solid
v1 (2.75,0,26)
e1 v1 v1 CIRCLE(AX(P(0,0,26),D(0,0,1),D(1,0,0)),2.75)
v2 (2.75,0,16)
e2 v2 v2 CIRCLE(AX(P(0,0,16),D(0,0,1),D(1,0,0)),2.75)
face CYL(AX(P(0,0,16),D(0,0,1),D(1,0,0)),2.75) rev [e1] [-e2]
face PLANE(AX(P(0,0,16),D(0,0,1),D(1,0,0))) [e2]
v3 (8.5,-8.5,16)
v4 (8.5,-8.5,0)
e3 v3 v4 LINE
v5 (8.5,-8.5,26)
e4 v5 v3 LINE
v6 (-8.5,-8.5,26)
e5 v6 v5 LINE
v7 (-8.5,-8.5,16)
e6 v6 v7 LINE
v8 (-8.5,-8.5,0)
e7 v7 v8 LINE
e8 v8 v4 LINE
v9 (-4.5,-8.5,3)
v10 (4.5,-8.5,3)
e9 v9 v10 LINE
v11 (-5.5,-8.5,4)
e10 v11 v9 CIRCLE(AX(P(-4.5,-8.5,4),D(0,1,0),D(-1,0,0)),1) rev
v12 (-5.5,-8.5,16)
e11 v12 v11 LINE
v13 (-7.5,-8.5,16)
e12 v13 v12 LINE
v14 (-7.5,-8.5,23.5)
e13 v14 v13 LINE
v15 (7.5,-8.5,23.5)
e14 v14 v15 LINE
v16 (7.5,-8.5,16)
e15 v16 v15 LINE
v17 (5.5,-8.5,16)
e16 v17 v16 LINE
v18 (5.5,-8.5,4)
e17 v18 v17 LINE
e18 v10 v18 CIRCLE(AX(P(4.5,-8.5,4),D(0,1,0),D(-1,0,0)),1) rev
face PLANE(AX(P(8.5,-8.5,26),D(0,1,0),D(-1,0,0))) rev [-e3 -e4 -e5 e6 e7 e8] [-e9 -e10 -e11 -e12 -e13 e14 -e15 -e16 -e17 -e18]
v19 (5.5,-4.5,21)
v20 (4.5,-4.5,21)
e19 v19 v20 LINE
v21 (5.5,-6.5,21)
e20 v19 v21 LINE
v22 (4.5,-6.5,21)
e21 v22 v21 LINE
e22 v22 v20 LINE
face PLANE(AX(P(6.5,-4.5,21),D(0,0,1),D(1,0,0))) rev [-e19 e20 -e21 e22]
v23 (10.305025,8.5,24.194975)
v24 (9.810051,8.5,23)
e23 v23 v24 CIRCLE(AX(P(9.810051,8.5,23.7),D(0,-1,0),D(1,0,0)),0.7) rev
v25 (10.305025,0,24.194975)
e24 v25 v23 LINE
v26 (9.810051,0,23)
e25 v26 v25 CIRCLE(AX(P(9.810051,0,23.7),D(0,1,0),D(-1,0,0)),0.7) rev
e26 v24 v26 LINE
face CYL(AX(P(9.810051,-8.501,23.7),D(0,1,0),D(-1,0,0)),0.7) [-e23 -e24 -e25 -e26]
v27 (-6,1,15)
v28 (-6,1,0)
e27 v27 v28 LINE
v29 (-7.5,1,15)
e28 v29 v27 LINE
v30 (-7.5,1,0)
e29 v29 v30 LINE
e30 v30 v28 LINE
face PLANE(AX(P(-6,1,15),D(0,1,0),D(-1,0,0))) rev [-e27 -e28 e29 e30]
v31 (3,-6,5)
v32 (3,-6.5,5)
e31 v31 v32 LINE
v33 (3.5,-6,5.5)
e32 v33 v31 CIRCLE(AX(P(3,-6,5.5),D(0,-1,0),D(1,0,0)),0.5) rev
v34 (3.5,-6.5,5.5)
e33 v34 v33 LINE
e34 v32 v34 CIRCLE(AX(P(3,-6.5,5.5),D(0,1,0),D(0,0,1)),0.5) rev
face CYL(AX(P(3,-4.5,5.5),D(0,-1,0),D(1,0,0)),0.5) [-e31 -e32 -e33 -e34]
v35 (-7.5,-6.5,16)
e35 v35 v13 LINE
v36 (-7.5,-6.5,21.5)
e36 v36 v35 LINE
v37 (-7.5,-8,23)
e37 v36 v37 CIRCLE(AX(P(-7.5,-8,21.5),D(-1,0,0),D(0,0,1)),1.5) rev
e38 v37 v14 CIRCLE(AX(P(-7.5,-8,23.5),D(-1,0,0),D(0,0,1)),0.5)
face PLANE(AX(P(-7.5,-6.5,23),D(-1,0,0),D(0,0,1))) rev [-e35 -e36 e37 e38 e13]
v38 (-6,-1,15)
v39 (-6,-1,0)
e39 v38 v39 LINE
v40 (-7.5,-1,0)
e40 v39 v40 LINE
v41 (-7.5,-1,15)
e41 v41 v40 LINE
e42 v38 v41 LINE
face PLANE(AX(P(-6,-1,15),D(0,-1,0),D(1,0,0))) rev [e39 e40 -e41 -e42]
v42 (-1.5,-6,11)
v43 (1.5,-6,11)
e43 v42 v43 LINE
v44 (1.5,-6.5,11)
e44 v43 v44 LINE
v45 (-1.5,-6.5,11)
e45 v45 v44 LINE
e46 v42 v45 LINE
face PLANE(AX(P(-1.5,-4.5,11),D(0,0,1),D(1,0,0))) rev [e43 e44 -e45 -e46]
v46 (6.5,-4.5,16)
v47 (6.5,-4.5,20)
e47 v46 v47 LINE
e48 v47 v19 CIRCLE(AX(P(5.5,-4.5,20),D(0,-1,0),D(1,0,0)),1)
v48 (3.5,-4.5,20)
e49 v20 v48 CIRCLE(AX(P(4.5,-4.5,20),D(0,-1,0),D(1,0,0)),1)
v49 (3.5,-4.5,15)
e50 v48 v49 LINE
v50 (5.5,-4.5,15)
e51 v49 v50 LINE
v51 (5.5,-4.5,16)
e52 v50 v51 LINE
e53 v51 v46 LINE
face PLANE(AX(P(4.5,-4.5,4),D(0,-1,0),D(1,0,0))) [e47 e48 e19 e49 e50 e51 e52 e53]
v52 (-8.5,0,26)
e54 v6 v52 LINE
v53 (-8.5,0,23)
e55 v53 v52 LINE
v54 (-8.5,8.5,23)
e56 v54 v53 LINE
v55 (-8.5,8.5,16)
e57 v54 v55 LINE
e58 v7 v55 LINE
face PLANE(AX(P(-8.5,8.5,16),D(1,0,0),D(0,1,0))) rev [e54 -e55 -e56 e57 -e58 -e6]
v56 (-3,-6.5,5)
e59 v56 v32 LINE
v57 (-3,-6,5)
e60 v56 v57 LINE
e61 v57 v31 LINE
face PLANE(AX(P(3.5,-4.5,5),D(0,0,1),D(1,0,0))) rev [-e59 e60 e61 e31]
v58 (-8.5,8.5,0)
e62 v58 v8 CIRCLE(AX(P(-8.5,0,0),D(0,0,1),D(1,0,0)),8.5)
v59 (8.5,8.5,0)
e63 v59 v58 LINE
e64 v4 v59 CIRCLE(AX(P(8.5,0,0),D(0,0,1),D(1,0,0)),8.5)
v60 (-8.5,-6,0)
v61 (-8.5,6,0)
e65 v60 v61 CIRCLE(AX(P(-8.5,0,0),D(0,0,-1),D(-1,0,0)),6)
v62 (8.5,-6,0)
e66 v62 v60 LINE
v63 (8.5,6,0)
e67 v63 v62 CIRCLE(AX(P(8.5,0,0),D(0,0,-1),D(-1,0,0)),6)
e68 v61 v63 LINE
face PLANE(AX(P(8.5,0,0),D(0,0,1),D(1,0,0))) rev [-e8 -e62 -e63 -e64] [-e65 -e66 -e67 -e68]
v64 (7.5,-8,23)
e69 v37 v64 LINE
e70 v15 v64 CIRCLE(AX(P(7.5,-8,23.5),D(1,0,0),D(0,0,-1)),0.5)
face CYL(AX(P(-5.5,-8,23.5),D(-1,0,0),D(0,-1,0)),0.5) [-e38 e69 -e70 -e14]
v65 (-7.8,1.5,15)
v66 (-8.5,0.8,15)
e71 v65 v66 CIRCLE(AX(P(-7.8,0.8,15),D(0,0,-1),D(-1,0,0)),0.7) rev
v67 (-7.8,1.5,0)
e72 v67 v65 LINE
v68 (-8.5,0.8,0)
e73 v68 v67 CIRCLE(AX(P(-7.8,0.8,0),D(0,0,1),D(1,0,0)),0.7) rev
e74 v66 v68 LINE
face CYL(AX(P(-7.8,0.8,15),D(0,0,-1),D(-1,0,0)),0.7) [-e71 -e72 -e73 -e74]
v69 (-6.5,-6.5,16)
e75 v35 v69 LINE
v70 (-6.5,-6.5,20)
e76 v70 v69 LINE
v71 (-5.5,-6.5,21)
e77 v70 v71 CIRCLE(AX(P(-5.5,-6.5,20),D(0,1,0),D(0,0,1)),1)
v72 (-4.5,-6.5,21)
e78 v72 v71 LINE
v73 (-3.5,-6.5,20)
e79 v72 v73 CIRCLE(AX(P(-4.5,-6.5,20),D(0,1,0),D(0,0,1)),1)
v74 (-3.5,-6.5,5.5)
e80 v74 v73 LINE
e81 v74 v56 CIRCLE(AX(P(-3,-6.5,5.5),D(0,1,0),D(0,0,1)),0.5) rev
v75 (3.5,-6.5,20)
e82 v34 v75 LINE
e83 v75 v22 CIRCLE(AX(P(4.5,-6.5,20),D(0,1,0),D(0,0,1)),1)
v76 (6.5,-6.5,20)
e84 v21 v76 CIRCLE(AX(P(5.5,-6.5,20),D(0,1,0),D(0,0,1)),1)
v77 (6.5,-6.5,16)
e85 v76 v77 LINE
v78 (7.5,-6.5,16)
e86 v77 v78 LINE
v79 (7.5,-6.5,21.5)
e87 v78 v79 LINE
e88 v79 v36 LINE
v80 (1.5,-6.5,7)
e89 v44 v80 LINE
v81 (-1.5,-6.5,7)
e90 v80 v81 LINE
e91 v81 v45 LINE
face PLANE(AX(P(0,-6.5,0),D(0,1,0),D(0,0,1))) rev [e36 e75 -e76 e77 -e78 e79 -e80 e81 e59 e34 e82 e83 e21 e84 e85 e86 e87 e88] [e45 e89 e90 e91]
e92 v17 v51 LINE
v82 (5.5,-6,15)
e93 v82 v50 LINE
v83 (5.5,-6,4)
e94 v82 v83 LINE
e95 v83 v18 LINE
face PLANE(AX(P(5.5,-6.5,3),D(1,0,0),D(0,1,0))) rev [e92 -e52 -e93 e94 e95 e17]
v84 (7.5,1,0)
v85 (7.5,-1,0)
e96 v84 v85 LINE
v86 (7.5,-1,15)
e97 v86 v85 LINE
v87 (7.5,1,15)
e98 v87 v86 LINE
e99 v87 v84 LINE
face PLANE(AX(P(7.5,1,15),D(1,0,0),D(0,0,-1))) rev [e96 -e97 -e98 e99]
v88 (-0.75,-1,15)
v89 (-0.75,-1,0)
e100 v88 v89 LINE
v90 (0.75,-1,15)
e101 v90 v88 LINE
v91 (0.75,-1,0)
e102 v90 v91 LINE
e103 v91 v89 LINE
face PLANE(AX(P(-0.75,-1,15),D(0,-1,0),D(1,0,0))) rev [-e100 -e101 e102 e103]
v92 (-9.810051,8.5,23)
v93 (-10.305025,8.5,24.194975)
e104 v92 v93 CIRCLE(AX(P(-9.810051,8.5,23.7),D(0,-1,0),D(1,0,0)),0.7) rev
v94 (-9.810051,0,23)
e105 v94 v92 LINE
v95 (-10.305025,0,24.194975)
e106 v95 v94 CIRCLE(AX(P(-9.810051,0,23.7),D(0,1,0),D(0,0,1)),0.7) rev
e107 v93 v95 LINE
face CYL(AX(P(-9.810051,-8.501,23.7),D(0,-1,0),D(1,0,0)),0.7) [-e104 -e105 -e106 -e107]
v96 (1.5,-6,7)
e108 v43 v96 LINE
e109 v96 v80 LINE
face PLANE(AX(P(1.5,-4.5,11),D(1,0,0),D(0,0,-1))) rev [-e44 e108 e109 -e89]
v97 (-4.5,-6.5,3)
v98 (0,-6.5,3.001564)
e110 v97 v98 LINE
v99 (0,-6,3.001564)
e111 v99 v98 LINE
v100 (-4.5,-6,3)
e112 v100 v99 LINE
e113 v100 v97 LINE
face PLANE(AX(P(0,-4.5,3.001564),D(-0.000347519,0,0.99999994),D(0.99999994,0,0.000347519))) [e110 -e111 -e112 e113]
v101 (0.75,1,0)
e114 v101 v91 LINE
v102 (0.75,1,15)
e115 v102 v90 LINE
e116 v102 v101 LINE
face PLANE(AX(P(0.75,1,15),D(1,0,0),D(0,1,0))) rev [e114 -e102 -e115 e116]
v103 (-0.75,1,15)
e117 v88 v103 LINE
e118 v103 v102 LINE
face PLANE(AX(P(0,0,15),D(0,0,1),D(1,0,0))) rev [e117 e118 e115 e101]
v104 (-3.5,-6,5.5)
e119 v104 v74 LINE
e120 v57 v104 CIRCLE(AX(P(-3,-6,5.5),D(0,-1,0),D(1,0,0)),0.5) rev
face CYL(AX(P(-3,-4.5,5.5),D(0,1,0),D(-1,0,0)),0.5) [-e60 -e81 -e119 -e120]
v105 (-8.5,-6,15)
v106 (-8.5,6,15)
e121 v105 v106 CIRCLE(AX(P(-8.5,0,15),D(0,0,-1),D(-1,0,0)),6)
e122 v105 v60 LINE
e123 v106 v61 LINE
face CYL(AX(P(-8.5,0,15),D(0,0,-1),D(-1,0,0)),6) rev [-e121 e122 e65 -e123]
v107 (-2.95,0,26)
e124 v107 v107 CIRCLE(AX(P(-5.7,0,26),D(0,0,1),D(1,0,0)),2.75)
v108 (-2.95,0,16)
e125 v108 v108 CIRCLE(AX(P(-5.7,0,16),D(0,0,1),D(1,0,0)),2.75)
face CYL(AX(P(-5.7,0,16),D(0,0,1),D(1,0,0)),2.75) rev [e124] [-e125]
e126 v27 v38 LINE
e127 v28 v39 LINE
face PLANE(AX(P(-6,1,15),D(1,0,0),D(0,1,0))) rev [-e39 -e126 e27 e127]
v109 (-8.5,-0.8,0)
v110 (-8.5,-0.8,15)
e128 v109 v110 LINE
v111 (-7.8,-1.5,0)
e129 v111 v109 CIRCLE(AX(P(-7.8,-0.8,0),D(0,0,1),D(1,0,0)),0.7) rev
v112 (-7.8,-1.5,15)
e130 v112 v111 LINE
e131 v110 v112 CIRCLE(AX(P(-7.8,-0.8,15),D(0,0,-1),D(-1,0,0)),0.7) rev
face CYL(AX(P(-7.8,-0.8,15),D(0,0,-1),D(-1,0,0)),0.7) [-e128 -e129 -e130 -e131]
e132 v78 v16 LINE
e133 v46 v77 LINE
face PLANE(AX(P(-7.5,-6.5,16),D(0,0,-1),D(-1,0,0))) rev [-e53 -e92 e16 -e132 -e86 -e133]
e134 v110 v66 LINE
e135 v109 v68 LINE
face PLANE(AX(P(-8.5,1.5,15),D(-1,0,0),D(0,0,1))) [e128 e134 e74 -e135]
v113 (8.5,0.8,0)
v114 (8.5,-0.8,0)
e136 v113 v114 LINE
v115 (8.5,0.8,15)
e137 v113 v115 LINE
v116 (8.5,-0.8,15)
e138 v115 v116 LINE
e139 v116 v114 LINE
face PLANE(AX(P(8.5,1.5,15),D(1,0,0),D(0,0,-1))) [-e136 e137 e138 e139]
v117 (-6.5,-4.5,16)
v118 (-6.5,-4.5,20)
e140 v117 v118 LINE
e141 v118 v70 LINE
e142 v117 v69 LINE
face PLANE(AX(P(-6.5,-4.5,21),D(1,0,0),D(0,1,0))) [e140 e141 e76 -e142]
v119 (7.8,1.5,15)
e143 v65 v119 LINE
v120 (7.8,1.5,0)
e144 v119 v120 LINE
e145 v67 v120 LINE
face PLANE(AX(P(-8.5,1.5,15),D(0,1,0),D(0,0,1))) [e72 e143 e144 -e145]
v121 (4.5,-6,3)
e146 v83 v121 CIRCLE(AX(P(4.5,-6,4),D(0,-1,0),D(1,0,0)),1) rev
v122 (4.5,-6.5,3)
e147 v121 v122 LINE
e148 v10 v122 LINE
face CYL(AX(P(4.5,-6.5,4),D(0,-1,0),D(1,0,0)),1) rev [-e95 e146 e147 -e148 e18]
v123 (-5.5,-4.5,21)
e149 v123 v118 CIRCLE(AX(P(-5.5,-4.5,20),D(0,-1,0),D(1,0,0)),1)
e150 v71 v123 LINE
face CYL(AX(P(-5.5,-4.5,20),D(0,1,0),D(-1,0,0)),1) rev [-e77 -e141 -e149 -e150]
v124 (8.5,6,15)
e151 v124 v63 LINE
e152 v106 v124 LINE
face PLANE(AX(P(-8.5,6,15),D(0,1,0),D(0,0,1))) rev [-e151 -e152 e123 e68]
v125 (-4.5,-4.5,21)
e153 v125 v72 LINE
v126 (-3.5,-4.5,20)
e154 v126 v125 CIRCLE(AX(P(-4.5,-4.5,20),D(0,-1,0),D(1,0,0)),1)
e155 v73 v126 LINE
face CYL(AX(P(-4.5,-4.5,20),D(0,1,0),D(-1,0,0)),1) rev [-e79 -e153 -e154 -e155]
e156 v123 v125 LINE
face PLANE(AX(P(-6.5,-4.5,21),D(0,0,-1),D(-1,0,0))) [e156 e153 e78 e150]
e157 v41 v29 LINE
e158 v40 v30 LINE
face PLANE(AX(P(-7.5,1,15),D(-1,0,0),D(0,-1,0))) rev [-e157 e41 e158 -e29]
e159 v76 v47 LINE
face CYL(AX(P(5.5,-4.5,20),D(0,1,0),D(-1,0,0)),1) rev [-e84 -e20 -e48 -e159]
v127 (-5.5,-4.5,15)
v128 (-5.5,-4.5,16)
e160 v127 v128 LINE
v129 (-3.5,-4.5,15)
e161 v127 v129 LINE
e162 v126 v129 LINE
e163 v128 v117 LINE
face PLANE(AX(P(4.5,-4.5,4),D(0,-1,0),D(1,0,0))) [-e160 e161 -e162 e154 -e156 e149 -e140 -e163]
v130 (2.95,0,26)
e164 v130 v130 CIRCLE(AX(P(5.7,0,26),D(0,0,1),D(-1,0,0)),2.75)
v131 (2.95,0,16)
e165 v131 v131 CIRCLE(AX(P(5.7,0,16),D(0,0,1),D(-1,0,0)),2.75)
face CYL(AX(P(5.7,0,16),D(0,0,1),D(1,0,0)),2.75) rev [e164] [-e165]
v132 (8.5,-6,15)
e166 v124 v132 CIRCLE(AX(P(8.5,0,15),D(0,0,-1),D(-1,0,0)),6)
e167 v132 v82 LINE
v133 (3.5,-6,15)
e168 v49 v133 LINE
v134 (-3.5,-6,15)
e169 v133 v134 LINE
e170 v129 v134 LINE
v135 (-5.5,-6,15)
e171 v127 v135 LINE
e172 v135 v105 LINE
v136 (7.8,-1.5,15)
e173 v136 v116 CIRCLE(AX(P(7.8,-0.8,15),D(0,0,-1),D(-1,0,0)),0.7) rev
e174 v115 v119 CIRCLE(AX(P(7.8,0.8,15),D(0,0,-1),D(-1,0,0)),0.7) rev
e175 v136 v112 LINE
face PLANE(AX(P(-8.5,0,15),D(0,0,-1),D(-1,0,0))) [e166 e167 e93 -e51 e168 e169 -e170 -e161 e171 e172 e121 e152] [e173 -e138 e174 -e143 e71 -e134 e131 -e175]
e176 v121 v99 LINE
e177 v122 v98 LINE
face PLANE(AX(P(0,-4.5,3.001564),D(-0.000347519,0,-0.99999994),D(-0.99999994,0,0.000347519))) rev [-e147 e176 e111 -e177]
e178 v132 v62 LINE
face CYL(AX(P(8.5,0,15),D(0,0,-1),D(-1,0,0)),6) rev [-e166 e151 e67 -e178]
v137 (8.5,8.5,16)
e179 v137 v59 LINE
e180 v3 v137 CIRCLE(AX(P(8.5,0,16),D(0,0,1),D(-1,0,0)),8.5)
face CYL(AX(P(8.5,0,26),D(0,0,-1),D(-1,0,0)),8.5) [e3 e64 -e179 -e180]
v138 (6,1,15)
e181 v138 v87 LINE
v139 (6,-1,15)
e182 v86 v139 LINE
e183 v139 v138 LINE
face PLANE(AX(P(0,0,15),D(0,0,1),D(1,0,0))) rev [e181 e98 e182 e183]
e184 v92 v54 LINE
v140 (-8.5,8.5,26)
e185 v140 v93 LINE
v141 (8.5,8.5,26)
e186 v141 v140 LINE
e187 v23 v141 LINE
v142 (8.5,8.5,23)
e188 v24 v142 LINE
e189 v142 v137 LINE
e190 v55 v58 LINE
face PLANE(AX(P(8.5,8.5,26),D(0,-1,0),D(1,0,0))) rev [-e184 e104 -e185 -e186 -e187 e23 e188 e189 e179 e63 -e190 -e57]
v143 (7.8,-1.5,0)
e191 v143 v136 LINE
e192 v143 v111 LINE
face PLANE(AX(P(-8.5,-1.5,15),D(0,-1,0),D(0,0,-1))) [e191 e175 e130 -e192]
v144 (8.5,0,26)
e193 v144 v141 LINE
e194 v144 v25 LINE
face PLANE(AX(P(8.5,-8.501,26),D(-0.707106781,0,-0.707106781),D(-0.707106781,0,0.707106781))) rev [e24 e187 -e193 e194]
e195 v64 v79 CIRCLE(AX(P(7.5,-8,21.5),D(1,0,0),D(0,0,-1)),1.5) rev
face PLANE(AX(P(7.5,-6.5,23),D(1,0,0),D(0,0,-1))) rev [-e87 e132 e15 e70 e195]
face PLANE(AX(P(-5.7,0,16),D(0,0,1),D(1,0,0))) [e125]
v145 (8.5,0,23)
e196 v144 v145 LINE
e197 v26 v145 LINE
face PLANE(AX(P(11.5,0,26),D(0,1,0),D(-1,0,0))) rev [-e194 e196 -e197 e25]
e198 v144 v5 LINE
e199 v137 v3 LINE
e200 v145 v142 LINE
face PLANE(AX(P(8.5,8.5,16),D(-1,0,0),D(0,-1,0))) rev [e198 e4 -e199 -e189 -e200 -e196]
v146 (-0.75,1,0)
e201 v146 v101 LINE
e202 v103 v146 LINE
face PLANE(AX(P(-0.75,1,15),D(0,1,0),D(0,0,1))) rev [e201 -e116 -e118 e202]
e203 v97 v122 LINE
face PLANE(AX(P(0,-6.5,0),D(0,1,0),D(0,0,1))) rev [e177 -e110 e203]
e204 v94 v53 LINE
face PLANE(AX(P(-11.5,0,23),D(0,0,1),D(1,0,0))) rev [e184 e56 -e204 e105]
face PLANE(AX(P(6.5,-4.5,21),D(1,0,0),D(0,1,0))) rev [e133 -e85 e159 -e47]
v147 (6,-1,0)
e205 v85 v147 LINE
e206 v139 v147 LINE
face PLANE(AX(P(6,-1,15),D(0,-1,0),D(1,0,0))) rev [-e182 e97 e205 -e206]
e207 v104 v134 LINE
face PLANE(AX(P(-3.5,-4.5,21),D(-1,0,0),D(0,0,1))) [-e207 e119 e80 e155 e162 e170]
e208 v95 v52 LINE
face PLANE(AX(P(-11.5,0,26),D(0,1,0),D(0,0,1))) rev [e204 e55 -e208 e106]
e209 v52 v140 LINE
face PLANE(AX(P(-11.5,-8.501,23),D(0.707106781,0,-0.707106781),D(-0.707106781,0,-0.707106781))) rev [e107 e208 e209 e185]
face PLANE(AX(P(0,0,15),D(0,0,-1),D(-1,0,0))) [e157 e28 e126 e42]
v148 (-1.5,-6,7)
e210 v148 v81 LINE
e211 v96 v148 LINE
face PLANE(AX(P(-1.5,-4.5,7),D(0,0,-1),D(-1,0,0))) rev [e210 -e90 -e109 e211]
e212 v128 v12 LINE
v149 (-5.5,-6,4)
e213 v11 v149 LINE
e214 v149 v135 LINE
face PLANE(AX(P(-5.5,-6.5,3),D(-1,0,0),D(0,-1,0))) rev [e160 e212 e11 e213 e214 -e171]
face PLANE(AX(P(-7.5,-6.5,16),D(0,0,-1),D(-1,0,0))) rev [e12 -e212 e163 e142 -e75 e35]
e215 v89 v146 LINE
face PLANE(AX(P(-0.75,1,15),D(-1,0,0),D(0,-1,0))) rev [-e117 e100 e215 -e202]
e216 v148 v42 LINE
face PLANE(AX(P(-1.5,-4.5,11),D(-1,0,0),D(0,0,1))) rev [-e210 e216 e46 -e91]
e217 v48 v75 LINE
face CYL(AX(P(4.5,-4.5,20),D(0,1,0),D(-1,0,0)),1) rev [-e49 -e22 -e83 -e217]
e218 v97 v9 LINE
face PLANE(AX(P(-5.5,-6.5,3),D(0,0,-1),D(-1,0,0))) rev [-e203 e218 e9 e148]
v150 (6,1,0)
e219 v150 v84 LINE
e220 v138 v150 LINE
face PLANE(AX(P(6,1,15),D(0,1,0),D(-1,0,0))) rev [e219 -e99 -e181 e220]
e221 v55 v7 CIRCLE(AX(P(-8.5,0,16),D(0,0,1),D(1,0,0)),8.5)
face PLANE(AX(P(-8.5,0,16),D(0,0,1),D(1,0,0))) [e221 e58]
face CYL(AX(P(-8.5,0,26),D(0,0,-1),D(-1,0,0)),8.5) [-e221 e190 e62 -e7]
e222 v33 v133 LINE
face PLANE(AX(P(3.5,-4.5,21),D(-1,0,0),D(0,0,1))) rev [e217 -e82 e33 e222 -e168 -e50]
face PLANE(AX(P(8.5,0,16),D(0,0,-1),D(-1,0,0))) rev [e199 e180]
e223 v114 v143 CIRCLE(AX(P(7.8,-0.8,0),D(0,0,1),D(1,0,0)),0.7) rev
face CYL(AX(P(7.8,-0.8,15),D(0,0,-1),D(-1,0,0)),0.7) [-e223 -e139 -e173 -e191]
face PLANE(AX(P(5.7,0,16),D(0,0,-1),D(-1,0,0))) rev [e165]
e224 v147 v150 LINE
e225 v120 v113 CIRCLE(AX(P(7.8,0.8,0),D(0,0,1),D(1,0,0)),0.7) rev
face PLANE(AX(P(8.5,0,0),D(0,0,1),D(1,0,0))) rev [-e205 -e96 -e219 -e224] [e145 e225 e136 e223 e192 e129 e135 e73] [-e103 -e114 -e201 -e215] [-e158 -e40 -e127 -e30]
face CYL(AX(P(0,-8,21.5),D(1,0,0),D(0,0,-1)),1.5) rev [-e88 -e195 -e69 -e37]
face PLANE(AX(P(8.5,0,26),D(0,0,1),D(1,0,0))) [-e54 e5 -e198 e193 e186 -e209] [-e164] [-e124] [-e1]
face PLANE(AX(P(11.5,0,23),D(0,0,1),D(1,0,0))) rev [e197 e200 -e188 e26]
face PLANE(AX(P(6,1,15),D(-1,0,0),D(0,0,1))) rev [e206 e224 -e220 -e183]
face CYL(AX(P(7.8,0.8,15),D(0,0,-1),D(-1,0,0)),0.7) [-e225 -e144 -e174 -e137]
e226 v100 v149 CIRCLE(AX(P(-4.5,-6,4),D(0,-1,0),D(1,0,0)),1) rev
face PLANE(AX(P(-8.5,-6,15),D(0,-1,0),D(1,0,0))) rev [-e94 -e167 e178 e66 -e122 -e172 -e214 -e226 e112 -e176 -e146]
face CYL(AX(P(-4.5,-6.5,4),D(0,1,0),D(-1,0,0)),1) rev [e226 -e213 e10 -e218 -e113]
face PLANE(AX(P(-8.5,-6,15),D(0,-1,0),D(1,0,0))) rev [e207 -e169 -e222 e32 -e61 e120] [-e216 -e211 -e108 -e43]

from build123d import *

# Parameters (mm, degrees)
EXTRUDE_1_DEPTH      = 26
CUT_EXTRUDE_START    = -10
CUT_EXTRUDE_1_DEPTH  = 10
SKETCH_3_W           = 3
SKETCH_3_H           = 8.5
EXTRUDE_2_DEPTH      = 3
CUT_EXTRUDE_2_REACH  = 37.412
SKETCH_5_W           = 3
SKETCH_5_H           = 8.5
EXTRUDE_3_DEPTH      = 3
CUT_EXTRUDE_3_REACH  = 37.412
SKETCH_7_W           = 11
SKETCH_7_H           = 20
CUT_EXTRUDE_4_DEPTH  = 2
FILLET_3_R           = 1
FILLET_4_R           = 1
SKETCH_10_W          = 15
SKETCH_10_H          = 7
CUT_EXTRUDE_5_DEPTH  = 2
CUT_EXTRUDE_START_2  = -4
CUT_EXTRUDE_6_DEPTH  = 4
FILLET_5_R           = 0.5
FILLET_6_R           = 0.5
FILLET_7_R           = 1
FILLET_9_R           = 0.7
FILLET_10_R          = 0.7
SKETCH_12_W          = 3
SKETCH_12_H          = 4
CUT_EXTRUDE_7_DEPTH  = 4
FILLET_11_R          = 1.5
FILLET_12_R          = 0.5
SKETCH_13_R          = 2.75
CUT_EXTRUDE_16_DEPTH = 10
SKETCH_14_W          = 17
SKETCH_14_H          = 3
CUT_EXTRUDE_20_DEPTH = 15
FILLET_13_R          = 0.7
SKETCH_15_W          = 1.5
SKETCH_15_H          = 2
CUT_EXTRUDE_22_DEPTH = 15


with BuildPart() as part:
    # ｽｹｯﾁ1 → ﾎﾞｽ - 押し出し1 (new body)
    with BuildSketch(Plane.XY):
        with BuildLine():
            Line((8.5, -8.5), (-8.5, -8.5))
            ThreePointArc((-8.5, -8.5), (-17, 0), (-8.5, 8.5))
            Line((-8.5, 8.5), (8.5, 8.5))
            ThreePointArc((8.5, 8.5), (17, 0), (8.5, -8.5))
        make_face()
    extrude(amount=EXTRUDE_1_DEPTH)

    # ｽｹｯﾁ2 → ｶｯﾄ - 押し出し1 (cut)
    with BuildSketch(Plane.XY.offset(26).offset(CUT_EXTRUDE_START)):
        with BuildLine():
            Line((-8.5, 8.5), (-8.5, -8.5))
            ThreePointArc((-8.5, -8.5), (-17, 0), (-8.5, 8.5))
        make_face()
        with BuildLine():
            Line((8.5, 8.5), (8.5, -8.5))
            ThreePointArc((8.5, -8.5), (17, 0), (8.5, 8.5))
        make_face()
    extrude(amount=CUT_EXTRUDE_1_DEPTH, mode=Mode.SUBTRACT)

    # ｽｹｯﾁ3 → ﾎﾞｽ - 押し出し2 (add)
    with BuildSketch(Plane(origin=(8.5, 0, 0), x_dir=(0, 0, -1), z_dir=(1, 0, 0))):
        with Locations((-24.5, 4.25)):
            Rectangle(SKETCH_3_W, SKETCH_3_H)
    extrude(amount=EXTRUDE_2_DEPTH)

    # ｽｹｯﾁ4 → ｶｯﾄ - 押し出し2 (cut, up to next)
    with BuildSketch(Plane(origin=(0, 8.5, 0), x_dir=(1, 0, 0), z_dir=(0, 1, 0)), mode=Mode.PRIVATE) as cut_extrude_2_sk1:
        Polygon((11.5, -23), (11.5, -26), (8.5, -26), align=None)
    cut_extrude_2_tool1 = extrude(cut_extrude_2_sk1.sketch, amount=-CUT_EXTRUDE_2_REACH, mode=Mode.PRIVATE) & part.part
    add(cut_extrude_2_tool1.solids().sort_by_distance((10.5, 8.5, 25))[0], mode=Mode.SUBTRACT)

    # ｽｹｯﾁ5 → ﾎﾞｽ - 押し出し3 (add)
    with BuildSketch(Plane.ZY.offset(8.5)):
        with Locations((24.5, 4.25)):
            Rectangle(SKETCH_5_W, SKETCH_5_H)
    extrude(amount=EXTRUDE_3_DEPTH)

    # ｽｹｯﾁ6 → ｶｯﾄ - 押し出し3 (cut, up to next)
    with BuildSketch(Plane(origin=(0, 8.5, 0), x_dir=(1, 0, 0), z_dir=(0, 1, 0)), mode=Mode.PRIVATE) as cut_extrude_3_sk1:
        Polygon((-11.5, -26), (-11.5, -23), (-8.5, -26), align=None)
    cut_extrude_3_tool1 = extrude(cut_extrude_3_sk1.sketch, amount=-CUT_EXTRUDE_3_REACH, mode=Mode.PRIVATE) & part.part
    add(cut_extrude_3_tool1.solids().sort_by_distance((-10.5, 8.5, 25))[0], mode=Mode.SUBTRACT)

    # ｽｹｯﾁ7 → ｶｯﾄ - 押し出し4 (cut)
    with BuildSketch(Plane.XZ.offset(8.5)):
        with Locations((0, 13)):
            Rectangle(SKETCH_7_W, SKETCH_7_H)
    extrude(amount=-CUT_EXTRUDE_4_DEPTH, mode=Mode.SUBTRACT)

    # ﾌｨﾚｯﾄ3
    fillet_3_edges = [part.edges().sort_by_distance(p)[0] for p in [
        (5.5, -7.5, 3),
    ]]
    fillet(fillet_3_edges, radius=FILLET_3_R)

    # ﾌｨﾚｯﾄ4
    fillet_4_edges = [part.edges().sort_by_distance(p)[0] for p in [
        (-5.5, -7.5, 3),
    ]]
    fillet(fillet_4_edges, radius=FILLET_4_R)

    # ｽｹｯﾁ10 → ｶｯﾄ - 押し出し5 (cut)
    with BuildSketch(Plane.XZ.offset(8.5)):
        with Locations((0, 19.5)):
            Rectangle(SKETCH_10_W, SKETCH_10_H)
    extrude(amount=-CUT_EXTRUDE_5_DEPTH, mode=Mode.SUBTRACT)

    # ｽｹｯﾁ11 → ｶｯﾄ - 押し出し6 (cut)
    with BuildSketch(Plane.XZ.offset(8.5).offset(CUT_EXTRUDE_START_2)):
        with BuildLine():
            Line((6.5, 21), (3.5, 21))
            Line((3.5, 21), (3.5, 5))
            Line((3.5, 5), (0, 5))
            Line((0, 5), (0, 3.001563835))
            Line((0, 3.001563835), (4.5, 3))
            ThreePointArc((4.5, 3), (5.207106781, 3.292893219), (5.5, 4))
            Line((5.5, 4), (5.5, 16))
            Line((5.5, 16), (6.5, 16))
            Line((6.5, 16), (6.5, 21))
        make_face()
    cut_extrude_6 = extrude(amount=CUT_EXTRUDE_6_DEPTH, mode=Mode.SUBTRACT)

    # ﾐﾗｰ1: ｶｯﾄ - 押し出し6 across plane
    add(cut_extrude_6.mirror(Plane(origin=(0, 0, 0), x_dir=(0, 0, 1), z_dir=(1, 0, 0))), mode=Mode.SUBTRACT)

    # ﾌｨﾚｯﾄ5
    fillet_5_edges = [part.edges().sort_by_distance(p)[0] for p in [
        (3.5, -5.5, 5),
    ]]
    fillet(fillet_5_edges, radius=FILLET_5_R)

    # ﾌｨﾚｯﾄ6
    fillet_6_edges = [part.edges().sort_by_distance(p)[0] for p in [
        (-3.5, -5.5, 5),
    ]]
    fillet(fillet_6_edges, radius=FILLET_6_R)

    # ﾌｨﾚｯﾄ7
    fillet_7_edges = [part.edges().sort_by_distance(p)[0] for p in [
        (3.5, -5.5, 21),
        (6.5, -5.5, 21),
        (-6.5, -5.5, 21),
        (-3.5, -5.5, 21),
    ]]
    fillet(fillet_7_edges, radius=FILLET_7_R)

    # ﾌｨﾚｯﾄ9
    fillet_9_edges = [part.edges().sort_by_distance(p)[0] for p in [
        (-11.5, 4.25, 23),
    ]]
    fillet(fillet_9_edges, radius=FILLET_9_R)

    # ﾌｨﾚｯﾄ10
    fillet_10_edges = [part.edges().sort_by_distance(p)[0] for p in [
        (11.5, 4.25, 23),
    ]]
    fillet(fillet_10_edges, radius=FILLET_10_R)

    # ｽｹｯﾁ12 → ｶｯﾄ - 押し出し7 (cut)
    with BuildSketch(Plane.XZ.offset(8.5)):
        with Locations((0, 9)):
            Rectangle(SKETCH_12_W, SKETCH_12_H)
    extrude(amount=-CUT_EXTRUDE_7_DEPTH, mode=Mode.SUBTRACT)

    # ﾌｨﾚｯﾄ11
    fillet_11_edges = [part.edges().sort_by_distance(p)[0] for p in [
        (0, -6.5, 23),
    ]]
    fillet(fillet_11_edges, radius=FILLET_11_R)

    # ﾌｨﾚｯﾄ12
    fillet_12_edges = [part.edges().sort_by_distance(p)[0] for p in [
        (0, -8.5, 23),
    ]]
    fillet(fillet_12_edges, radius=FILLET_12_R - 0.0001)  # a hair under: the kernel refuses the full size

    # ｽｹｯﾁ13 → ｶｯﾄ - 押し出し16 (cut)
    with BuildSketch(Plane.XY.offset(26)):
        Circle(SKETCH_13_R)
        with Locations((-5.7, 0)):
            Circle(SKETCH_13_R)
        with Locations(Location((5.7, 0, 0), (0, 0, 180))):
            Circle(SKETCH_13_R)
    extrude(amount=-CUT_EXTRUDE_16_DEPTH, mode=Mode.SUBTRACT)

    # ｽｹｯﾁ14 → ｶｯﾄ - 押し出し20 (cut)
    with BuildSketch(Plane(origin=(0, 0, 0), x_dir=(-1, 0, 0), z_dir=(0, 0, -1))):
        with BuildLine():
            Line((8.5, -6), (-8.5, -6))
            ThreePointArc((-8.5, -6), (-14.5, 0), (-8.5, 6))
            Line((-8.5, 6), (8.5, 6))
            ThreePointArc((8.5, 6), (14.5, 0), (8.5, -6))
        make_face()
        Rectangle(SKETCH_14_W, SKETCH_14_H, mode=Mode.SUBTRACT)
    extrude(amount=-CUT_EXTRUDE_20_DEPTH, mode=Mode.SUBTRACT)

    # ﾌｨﾚｯﾄ13
    fillet_13_edges = [part.edges().sort_by_distance(p)[0] for p in [
        (8.5, 1.5, 7.5),
        (-8.5, 1.5, 7.5),
        (-8.5, -1.5, 7.5),
        (8.5, -1.5, 7.5),
    ]]
    fillet(fillet_13_edges, radius=FILLET_13_R)

    # ｽｹｯﾁ15 → ｶｯﾄ - 押し出し22 (cut)
    with BuildSketch(Plane(origin=(0, 0, 0), x_dir=(-1, 0, 0), z_dir=(0, 0, -1))):
        with Locations((-6.75, 0)):
            Rectangle(SKETCH_15_W, SKETCH_15_H)
        with Locations((6.75, 0)):
            Rectangle(SKETCH_15_W, SKETCH_15_H)
        Rectangle(SKETCH_15_W, SKETCH_15_H)
    extrude(amount=-CUT_EXTRUDE_22_DEPTH, mode=Mode.SUBTRACT)


solid = part.part
